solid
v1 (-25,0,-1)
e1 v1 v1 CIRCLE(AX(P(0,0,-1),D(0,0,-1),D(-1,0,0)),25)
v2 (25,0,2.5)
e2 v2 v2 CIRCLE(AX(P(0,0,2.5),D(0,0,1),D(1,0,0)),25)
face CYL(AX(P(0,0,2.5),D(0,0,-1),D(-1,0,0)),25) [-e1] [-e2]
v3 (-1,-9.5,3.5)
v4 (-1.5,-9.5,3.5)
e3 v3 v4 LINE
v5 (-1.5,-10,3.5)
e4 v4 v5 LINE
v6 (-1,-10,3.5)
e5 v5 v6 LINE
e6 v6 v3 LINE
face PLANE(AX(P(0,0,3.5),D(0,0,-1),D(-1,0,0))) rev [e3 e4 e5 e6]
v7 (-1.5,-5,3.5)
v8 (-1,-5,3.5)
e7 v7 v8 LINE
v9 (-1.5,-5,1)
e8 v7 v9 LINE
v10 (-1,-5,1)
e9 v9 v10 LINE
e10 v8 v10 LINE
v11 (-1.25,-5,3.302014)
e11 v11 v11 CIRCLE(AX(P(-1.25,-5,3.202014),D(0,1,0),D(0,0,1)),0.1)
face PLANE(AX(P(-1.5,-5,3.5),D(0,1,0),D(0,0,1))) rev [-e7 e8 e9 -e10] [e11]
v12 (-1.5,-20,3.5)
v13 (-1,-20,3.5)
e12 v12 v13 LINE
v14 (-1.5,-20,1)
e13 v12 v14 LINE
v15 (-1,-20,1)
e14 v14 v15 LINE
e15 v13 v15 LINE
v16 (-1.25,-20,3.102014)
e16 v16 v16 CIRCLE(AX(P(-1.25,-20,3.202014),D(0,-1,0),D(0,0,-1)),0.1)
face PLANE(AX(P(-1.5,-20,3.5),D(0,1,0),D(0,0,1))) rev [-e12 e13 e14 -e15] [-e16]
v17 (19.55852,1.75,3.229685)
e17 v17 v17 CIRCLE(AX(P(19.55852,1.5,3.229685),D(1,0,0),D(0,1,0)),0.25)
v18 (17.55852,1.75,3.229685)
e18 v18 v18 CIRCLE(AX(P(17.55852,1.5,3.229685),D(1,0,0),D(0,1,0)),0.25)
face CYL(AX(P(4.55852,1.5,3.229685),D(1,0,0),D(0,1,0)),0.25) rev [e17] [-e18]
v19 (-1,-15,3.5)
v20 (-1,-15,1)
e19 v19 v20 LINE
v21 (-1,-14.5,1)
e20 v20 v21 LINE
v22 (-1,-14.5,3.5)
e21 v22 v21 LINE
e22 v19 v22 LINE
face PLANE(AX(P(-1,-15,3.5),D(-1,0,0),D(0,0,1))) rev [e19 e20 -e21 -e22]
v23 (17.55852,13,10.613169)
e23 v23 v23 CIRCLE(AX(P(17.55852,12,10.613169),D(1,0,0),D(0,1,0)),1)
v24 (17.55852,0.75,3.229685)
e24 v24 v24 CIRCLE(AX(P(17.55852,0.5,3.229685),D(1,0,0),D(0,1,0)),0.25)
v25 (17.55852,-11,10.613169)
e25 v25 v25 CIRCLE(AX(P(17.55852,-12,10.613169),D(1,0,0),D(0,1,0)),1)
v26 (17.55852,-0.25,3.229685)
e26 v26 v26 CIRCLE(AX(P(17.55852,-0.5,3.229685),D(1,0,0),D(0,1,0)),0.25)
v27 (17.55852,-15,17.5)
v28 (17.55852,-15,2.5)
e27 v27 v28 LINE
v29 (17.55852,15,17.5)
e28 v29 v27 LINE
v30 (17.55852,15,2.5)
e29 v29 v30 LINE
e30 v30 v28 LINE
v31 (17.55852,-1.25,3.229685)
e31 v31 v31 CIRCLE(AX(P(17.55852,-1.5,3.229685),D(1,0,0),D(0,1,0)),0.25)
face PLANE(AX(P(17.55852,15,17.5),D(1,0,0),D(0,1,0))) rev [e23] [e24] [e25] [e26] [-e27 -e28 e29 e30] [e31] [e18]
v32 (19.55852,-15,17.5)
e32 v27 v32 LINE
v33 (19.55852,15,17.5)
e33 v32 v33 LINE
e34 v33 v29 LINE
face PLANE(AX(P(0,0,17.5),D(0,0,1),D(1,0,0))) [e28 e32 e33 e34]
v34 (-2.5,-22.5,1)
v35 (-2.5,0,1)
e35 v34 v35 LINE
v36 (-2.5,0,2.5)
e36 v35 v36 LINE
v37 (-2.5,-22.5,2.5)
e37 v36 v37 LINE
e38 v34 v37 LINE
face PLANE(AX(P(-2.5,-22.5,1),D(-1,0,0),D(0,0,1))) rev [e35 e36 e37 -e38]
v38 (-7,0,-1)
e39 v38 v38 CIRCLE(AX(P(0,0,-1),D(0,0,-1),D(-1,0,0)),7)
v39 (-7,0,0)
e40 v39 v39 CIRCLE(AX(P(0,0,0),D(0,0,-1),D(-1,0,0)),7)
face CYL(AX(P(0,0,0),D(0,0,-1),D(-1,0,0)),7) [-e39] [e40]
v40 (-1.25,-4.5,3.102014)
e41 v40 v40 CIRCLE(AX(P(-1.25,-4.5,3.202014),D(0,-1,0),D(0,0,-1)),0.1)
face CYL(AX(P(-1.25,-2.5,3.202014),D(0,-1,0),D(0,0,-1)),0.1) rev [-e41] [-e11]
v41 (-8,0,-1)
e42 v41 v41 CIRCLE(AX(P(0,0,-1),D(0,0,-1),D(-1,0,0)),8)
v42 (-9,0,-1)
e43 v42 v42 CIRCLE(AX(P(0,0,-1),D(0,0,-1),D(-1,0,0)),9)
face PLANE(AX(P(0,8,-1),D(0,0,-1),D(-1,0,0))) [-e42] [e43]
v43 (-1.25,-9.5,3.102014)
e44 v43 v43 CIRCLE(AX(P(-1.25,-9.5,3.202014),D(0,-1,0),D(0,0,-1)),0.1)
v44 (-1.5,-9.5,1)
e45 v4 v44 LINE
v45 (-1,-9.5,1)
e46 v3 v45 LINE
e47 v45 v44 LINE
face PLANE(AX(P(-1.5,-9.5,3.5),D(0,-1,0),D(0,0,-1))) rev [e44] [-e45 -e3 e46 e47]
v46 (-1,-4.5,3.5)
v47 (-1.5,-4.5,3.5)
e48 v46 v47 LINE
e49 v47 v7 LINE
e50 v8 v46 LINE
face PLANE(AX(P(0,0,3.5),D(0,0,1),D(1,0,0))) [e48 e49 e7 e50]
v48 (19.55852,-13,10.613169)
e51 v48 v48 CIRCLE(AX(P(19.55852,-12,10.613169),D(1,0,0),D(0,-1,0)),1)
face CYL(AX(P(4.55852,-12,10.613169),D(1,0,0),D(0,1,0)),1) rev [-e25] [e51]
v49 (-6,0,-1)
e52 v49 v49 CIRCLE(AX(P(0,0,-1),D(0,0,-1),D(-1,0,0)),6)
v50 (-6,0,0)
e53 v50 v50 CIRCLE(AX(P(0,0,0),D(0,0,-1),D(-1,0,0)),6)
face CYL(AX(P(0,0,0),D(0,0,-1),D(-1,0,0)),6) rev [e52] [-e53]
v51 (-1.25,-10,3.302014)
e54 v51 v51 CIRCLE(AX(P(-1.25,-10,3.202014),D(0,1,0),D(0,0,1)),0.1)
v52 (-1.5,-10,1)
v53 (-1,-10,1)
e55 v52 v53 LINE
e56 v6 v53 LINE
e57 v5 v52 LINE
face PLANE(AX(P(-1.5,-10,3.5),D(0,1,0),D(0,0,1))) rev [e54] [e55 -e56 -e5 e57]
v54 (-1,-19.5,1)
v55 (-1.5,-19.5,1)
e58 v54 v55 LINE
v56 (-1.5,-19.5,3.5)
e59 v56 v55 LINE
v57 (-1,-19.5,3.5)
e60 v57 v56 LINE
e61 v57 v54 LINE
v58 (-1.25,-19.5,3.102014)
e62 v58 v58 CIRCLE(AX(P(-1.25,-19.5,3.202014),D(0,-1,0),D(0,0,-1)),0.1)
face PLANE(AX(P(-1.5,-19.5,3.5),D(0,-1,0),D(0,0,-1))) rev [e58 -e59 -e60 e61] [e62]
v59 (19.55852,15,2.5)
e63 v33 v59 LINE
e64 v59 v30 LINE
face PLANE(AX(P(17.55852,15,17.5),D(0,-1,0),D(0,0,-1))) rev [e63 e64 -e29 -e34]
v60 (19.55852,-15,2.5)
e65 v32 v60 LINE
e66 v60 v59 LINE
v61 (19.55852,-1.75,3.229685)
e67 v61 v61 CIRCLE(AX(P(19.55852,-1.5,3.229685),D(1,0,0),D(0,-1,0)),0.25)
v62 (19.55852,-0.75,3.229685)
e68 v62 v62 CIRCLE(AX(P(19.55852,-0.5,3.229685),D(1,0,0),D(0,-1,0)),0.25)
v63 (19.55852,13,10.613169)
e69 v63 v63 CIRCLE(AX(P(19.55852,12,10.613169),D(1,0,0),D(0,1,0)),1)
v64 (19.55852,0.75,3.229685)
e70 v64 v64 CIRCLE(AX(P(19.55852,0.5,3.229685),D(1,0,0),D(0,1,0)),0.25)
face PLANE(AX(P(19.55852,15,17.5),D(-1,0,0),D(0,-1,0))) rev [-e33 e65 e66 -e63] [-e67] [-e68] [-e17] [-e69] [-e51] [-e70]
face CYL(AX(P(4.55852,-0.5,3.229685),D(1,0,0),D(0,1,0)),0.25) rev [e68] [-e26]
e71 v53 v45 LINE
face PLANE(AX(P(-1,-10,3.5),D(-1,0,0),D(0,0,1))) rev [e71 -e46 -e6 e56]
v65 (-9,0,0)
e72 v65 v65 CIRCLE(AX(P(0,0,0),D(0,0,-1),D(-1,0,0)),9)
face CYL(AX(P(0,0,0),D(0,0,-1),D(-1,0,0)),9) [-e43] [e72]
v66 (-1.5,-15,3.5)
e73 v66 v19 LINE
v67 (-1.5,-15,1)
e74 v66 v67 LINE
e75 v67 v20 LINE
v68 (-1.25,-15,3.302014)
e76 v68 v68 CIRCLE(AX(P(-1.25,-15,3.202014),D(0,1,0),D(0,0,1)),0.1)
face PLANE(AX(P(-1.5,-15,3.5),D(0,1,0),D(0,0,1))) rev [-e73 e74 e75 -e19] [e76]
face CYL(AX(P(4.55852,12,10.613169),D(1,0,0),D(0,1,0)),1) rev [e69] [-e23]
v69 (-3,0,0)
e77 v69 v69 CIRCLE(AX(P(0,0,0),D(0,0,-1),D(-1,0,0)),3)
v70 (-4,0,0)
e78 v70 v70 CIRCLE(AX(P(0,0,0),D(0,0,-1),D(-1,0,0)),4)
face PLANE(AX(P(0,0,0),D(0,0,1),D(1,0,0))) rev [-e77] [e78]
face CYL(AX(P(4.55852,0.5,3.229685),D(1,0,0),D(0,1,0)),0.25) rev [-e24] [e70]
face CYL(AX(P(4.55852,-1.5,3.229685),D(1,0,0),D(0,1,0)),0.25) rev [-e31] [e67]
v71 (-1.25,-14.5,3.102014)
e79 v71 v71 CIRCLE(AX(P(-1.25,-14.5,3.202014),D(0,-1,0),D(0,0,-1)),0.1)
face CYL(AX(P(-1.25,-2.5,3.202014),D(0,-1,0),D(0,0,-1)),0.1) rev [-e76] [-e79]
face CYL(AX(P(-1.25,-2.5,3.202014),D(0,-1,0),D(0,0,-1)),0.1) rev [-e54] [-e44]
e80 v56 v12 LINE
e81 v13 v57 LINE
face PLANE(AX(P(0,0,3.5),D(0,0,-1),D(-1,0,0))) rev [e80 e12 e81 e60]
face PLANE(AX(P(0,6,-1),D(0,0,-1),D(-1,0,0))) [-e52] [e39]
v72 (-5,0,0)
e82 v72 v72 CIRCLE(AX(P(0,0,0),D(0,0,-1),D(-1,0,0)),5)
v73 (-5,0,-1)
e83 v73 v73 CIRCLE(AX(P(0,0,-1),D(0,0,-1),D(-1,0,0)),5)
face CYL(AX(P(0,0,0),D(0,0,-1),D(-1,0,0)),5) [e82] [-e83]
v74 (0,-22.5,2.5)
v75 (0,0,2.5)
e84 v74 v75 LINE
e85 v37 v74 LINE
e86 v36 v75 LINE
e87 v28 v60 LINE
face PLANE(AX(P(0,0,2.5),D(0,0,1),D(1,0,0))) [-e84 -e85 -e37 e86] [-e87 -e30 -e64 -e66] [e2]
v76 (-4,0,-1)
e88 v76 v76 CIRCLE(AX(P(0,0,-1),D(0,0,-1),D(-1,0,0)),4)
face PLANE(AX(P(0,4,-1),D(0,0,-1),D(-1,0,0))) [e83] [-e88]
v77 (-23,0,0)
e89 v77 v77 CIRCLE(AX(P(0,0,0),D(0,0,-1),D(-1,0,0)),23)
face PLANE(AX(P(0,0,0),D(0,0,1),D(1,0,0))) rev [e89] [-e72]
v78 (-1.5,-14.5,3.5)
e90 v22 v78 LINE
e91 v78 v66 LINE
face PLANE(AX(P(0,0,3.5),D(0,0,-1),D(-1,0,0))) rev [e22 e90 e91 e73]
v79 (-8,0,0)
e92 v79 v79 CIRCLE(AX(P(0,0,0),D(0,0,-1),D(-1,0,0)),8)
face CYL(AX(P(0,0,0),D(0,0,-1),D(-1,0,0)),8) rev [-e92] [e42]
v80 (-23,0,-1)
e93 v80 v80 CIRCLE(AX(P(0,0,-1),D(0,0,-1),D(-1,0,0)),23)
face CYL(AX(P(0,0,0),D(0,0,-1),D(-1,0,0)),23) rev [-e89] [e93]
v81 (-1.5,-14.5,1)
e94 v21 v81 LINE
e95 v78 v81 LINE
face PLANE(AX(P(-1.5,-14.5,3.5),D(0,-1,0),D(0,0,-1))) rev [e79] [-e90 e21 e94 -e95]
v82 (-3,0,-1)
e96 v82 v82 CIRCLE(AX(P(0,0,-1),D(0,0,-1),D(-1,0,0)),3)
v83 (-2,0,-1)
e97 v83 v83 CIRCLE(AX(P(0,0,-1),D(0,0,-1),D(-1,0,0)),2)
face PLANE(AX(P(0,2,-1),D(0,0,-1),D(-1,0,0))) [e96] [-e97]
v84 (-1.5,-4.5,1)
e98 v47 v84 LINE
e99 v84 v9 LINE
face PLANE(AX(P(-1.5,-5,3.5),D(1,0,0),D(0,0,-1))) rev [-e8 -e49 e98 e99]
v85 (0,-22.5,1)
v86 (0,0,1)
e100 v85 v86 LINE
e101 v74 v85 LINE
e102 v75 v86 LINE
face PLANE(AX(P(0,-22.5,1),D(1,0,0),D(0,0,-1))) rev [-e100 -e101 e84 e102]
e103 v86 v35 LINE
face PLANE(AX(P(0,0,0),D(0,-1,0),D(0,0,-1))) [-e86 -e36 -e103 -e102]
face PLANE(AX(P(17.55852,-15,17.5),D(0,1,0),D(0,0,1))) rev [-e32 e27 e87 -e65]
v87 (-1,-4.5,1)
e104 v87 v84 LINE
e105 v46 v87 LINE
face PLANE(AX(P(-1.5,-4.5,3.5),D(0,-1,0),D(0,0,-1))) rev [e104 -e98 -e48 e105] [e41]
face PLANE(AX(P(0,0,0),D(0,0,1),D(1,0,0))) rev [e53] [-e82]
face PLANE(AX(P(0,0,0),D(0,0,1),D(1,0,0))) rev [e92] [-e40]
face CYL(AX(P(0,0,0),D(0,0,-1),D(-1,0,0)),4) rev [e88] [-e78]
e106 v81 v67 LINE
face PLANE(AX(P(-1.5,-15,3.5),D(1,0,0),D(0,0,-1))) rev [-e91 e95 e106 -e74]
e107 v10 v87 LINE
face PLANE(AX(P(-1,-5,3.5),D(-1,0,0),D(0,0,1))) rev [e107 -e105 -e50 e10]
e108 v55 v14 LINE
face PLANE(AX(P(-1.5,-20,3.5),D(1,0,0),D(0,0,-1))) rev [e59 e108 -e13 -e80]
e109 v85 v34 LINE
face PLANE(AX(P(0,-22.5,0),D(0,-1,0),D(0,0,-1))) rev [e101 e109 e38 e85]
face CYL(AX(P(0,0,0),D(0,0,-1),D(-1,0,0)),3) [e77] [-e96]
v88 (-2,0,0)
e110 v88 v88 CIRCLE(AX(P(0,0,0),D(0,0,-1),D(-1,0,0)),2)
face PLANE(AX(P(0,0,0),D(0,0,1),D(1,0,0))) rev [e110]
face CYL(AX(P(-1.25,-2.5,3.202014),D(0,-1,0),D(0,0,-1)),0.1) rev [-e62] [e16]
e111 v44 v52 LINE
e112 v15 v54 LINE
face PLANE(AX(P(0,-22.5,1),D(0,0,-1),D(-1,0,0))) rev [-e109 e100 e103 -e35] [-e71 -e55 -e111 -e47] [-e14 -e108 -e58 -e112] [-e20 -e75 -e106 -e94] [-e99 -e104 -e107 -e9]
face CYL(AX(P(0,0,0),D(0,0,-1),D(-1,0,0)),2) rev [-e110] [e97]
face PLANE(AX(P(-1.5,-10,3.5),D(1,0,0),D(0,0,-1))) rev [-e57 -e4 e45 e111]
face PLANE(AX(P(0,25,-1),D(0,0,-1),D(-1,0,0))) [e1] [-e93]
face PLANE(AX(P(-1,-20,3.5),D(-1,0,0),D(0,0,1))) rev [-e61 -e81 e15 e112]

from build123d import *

# Parameters (mm, degrees)
SKETCH2_R           = 25
BOSS_EXTRUDE1_DEPTH = 2.5
SKETCH4_W           = 2.5
SKETCH4_H           = 2.726925283
CUT_EXTRUDE1_DEPTH  = 22.5
SKETCH8_W           = 1
SKETCH8_H           = 1
SKETCH8_W_2         = 2
SKETCH9_W           = 0.5
SKETCH9_H           = 0.5
BOSS_EXTRUDE3_DEPTH = 3.5
SKETCH10_R          = 0.1
CUT_EXTRUDE2_DEPTH  = 17.5
SKETCH11_W          = 2
SKETCH11_H          = 30
BOSS_EXTRUDE4_DEPTH = 15
SKETCH12_R          = 1
SKETCH12_R_2        = 0.25
CUT_EXTRUDE3_DEPTH  = 15


with BuildPart() as part:
    # Sketch2 → Boss-Extrude1 (new body)
    with BuildSketch(Plane(origin=(0, 0, 0), x_dir=(0, 1, 0), z_dir=(0, 0, 1))):
        Circle(SKETCH2_R)
    extrude(amount=BOSS_EXTRUDE1_DEPTH)

    # Sketch4 → Cut-Extrude1 (cut)
    with BuildSketch(Plane(origin=(0, 0, 0), x_dir=(-1, 0, 0), z_dir=(0, 1, 0))):
        with Locations((1.25, 2.363462641)):
            Rectangle(SKETCH4_W, SKETCH4_H)
    extrude(amount=-CUT_EXTRUDE1_DEPTH, mode=Mode.SUBTRACT)

    # Sketch8 → Revolve2 (revolve)
    with BuildSketch(Plane.YZ):
        with Locations((2.5, -0.5)):
            Rectangle(SKETCH8_W, SKETCH8_H)
        with Locations((4.5, -0.5)):
            Rectangle(SKETCH8_W, SKETCH8_H)
        with Locations((6.5, -0.5)):
            Rectangle(SKETCH8_W, SKETCH8_H)
        with Locations((8.5, -0.5)):
            Rectangle(SKETCH8_W, SKETCH8_H)
        with Locations((24, -0.5)):
            Rectangle(SKETCH8_W_2, SKETCH8_H)
    revolve(axis=Axis((0, 0, 0), (0, 0, 1)))

    # Sketch9 → Boss-Extrude3 (add)
    with BuildSketch(Plane(origin=(0, 0, 0), x_dir=(0, 1, 0), z_dir=(0, 0, 1))):
        with Locations((-4.75, 1.25)):
            Rectangle(SKETCH9_W, SKETCH9_H)
        with Locations((-9.75, 1.25)):
            Rectangle(SKETCH9_W, SKETCH9_H)
        with Locations((-14.75, 1.25)):
            Rectangle(SKETCH9_W, SKETCH9_H)
        with Locations((-19.75, 1.25)):
            Rectangle(SKETCH9_W, SKETCH9_H)
    extrude(amount=BOSS_EXTRUDE3_DEPTH)

    # Sketch10 → Cut-Extrude2 (cut)
    with BuildSketch(Plane.XZ.offset(20)):
        with Locations((-1.25, 3.202014363)):
            Circle(SKETCH10_R)
    extrude(amount=-CUT_EXTRUDE2_DEPTH, mode=Mode.SUBTRACT)

    # Sketch11 → Boss-Extrude4 (add)
    with BuildSketch(Plane.XY.offset(2.5)):
        with Locations((18.558520072, 0)):
            Rectangle(SKETCH11_W, SKETCH11_H)
    extrude(amount=BOSS_EXTRUDE4_DEPTH)

    # Sketch12 → Cut-Extrude3 (cut)
    with BuildSketch(Plane.YZ.offset(19.558520072)):
        with Locations((12, 10.613168665)):
            Circle(SKETCH12_R)
        with Locations((-12, 10.613168665)):
            Circle(SKETCH12_R)
        with Locations((0.5, 3.229684711)):
            Circle(SKETCH12_R_2)
        with Locations((1.5, 3.229684711)):
            Circle(SKETCH12_R_2)
        with Locations((-1.5, 3.229684711)):
            Circle(SKETCH12_R_2)
        with Locations((-0.5, 3.229684711)):
            Circle(SKETCH12_R_2)
    extrude(amount=-CUT_EXTRUDE3_DEPTH, mode=Mode.SUBTRACT)


solid = part.part
